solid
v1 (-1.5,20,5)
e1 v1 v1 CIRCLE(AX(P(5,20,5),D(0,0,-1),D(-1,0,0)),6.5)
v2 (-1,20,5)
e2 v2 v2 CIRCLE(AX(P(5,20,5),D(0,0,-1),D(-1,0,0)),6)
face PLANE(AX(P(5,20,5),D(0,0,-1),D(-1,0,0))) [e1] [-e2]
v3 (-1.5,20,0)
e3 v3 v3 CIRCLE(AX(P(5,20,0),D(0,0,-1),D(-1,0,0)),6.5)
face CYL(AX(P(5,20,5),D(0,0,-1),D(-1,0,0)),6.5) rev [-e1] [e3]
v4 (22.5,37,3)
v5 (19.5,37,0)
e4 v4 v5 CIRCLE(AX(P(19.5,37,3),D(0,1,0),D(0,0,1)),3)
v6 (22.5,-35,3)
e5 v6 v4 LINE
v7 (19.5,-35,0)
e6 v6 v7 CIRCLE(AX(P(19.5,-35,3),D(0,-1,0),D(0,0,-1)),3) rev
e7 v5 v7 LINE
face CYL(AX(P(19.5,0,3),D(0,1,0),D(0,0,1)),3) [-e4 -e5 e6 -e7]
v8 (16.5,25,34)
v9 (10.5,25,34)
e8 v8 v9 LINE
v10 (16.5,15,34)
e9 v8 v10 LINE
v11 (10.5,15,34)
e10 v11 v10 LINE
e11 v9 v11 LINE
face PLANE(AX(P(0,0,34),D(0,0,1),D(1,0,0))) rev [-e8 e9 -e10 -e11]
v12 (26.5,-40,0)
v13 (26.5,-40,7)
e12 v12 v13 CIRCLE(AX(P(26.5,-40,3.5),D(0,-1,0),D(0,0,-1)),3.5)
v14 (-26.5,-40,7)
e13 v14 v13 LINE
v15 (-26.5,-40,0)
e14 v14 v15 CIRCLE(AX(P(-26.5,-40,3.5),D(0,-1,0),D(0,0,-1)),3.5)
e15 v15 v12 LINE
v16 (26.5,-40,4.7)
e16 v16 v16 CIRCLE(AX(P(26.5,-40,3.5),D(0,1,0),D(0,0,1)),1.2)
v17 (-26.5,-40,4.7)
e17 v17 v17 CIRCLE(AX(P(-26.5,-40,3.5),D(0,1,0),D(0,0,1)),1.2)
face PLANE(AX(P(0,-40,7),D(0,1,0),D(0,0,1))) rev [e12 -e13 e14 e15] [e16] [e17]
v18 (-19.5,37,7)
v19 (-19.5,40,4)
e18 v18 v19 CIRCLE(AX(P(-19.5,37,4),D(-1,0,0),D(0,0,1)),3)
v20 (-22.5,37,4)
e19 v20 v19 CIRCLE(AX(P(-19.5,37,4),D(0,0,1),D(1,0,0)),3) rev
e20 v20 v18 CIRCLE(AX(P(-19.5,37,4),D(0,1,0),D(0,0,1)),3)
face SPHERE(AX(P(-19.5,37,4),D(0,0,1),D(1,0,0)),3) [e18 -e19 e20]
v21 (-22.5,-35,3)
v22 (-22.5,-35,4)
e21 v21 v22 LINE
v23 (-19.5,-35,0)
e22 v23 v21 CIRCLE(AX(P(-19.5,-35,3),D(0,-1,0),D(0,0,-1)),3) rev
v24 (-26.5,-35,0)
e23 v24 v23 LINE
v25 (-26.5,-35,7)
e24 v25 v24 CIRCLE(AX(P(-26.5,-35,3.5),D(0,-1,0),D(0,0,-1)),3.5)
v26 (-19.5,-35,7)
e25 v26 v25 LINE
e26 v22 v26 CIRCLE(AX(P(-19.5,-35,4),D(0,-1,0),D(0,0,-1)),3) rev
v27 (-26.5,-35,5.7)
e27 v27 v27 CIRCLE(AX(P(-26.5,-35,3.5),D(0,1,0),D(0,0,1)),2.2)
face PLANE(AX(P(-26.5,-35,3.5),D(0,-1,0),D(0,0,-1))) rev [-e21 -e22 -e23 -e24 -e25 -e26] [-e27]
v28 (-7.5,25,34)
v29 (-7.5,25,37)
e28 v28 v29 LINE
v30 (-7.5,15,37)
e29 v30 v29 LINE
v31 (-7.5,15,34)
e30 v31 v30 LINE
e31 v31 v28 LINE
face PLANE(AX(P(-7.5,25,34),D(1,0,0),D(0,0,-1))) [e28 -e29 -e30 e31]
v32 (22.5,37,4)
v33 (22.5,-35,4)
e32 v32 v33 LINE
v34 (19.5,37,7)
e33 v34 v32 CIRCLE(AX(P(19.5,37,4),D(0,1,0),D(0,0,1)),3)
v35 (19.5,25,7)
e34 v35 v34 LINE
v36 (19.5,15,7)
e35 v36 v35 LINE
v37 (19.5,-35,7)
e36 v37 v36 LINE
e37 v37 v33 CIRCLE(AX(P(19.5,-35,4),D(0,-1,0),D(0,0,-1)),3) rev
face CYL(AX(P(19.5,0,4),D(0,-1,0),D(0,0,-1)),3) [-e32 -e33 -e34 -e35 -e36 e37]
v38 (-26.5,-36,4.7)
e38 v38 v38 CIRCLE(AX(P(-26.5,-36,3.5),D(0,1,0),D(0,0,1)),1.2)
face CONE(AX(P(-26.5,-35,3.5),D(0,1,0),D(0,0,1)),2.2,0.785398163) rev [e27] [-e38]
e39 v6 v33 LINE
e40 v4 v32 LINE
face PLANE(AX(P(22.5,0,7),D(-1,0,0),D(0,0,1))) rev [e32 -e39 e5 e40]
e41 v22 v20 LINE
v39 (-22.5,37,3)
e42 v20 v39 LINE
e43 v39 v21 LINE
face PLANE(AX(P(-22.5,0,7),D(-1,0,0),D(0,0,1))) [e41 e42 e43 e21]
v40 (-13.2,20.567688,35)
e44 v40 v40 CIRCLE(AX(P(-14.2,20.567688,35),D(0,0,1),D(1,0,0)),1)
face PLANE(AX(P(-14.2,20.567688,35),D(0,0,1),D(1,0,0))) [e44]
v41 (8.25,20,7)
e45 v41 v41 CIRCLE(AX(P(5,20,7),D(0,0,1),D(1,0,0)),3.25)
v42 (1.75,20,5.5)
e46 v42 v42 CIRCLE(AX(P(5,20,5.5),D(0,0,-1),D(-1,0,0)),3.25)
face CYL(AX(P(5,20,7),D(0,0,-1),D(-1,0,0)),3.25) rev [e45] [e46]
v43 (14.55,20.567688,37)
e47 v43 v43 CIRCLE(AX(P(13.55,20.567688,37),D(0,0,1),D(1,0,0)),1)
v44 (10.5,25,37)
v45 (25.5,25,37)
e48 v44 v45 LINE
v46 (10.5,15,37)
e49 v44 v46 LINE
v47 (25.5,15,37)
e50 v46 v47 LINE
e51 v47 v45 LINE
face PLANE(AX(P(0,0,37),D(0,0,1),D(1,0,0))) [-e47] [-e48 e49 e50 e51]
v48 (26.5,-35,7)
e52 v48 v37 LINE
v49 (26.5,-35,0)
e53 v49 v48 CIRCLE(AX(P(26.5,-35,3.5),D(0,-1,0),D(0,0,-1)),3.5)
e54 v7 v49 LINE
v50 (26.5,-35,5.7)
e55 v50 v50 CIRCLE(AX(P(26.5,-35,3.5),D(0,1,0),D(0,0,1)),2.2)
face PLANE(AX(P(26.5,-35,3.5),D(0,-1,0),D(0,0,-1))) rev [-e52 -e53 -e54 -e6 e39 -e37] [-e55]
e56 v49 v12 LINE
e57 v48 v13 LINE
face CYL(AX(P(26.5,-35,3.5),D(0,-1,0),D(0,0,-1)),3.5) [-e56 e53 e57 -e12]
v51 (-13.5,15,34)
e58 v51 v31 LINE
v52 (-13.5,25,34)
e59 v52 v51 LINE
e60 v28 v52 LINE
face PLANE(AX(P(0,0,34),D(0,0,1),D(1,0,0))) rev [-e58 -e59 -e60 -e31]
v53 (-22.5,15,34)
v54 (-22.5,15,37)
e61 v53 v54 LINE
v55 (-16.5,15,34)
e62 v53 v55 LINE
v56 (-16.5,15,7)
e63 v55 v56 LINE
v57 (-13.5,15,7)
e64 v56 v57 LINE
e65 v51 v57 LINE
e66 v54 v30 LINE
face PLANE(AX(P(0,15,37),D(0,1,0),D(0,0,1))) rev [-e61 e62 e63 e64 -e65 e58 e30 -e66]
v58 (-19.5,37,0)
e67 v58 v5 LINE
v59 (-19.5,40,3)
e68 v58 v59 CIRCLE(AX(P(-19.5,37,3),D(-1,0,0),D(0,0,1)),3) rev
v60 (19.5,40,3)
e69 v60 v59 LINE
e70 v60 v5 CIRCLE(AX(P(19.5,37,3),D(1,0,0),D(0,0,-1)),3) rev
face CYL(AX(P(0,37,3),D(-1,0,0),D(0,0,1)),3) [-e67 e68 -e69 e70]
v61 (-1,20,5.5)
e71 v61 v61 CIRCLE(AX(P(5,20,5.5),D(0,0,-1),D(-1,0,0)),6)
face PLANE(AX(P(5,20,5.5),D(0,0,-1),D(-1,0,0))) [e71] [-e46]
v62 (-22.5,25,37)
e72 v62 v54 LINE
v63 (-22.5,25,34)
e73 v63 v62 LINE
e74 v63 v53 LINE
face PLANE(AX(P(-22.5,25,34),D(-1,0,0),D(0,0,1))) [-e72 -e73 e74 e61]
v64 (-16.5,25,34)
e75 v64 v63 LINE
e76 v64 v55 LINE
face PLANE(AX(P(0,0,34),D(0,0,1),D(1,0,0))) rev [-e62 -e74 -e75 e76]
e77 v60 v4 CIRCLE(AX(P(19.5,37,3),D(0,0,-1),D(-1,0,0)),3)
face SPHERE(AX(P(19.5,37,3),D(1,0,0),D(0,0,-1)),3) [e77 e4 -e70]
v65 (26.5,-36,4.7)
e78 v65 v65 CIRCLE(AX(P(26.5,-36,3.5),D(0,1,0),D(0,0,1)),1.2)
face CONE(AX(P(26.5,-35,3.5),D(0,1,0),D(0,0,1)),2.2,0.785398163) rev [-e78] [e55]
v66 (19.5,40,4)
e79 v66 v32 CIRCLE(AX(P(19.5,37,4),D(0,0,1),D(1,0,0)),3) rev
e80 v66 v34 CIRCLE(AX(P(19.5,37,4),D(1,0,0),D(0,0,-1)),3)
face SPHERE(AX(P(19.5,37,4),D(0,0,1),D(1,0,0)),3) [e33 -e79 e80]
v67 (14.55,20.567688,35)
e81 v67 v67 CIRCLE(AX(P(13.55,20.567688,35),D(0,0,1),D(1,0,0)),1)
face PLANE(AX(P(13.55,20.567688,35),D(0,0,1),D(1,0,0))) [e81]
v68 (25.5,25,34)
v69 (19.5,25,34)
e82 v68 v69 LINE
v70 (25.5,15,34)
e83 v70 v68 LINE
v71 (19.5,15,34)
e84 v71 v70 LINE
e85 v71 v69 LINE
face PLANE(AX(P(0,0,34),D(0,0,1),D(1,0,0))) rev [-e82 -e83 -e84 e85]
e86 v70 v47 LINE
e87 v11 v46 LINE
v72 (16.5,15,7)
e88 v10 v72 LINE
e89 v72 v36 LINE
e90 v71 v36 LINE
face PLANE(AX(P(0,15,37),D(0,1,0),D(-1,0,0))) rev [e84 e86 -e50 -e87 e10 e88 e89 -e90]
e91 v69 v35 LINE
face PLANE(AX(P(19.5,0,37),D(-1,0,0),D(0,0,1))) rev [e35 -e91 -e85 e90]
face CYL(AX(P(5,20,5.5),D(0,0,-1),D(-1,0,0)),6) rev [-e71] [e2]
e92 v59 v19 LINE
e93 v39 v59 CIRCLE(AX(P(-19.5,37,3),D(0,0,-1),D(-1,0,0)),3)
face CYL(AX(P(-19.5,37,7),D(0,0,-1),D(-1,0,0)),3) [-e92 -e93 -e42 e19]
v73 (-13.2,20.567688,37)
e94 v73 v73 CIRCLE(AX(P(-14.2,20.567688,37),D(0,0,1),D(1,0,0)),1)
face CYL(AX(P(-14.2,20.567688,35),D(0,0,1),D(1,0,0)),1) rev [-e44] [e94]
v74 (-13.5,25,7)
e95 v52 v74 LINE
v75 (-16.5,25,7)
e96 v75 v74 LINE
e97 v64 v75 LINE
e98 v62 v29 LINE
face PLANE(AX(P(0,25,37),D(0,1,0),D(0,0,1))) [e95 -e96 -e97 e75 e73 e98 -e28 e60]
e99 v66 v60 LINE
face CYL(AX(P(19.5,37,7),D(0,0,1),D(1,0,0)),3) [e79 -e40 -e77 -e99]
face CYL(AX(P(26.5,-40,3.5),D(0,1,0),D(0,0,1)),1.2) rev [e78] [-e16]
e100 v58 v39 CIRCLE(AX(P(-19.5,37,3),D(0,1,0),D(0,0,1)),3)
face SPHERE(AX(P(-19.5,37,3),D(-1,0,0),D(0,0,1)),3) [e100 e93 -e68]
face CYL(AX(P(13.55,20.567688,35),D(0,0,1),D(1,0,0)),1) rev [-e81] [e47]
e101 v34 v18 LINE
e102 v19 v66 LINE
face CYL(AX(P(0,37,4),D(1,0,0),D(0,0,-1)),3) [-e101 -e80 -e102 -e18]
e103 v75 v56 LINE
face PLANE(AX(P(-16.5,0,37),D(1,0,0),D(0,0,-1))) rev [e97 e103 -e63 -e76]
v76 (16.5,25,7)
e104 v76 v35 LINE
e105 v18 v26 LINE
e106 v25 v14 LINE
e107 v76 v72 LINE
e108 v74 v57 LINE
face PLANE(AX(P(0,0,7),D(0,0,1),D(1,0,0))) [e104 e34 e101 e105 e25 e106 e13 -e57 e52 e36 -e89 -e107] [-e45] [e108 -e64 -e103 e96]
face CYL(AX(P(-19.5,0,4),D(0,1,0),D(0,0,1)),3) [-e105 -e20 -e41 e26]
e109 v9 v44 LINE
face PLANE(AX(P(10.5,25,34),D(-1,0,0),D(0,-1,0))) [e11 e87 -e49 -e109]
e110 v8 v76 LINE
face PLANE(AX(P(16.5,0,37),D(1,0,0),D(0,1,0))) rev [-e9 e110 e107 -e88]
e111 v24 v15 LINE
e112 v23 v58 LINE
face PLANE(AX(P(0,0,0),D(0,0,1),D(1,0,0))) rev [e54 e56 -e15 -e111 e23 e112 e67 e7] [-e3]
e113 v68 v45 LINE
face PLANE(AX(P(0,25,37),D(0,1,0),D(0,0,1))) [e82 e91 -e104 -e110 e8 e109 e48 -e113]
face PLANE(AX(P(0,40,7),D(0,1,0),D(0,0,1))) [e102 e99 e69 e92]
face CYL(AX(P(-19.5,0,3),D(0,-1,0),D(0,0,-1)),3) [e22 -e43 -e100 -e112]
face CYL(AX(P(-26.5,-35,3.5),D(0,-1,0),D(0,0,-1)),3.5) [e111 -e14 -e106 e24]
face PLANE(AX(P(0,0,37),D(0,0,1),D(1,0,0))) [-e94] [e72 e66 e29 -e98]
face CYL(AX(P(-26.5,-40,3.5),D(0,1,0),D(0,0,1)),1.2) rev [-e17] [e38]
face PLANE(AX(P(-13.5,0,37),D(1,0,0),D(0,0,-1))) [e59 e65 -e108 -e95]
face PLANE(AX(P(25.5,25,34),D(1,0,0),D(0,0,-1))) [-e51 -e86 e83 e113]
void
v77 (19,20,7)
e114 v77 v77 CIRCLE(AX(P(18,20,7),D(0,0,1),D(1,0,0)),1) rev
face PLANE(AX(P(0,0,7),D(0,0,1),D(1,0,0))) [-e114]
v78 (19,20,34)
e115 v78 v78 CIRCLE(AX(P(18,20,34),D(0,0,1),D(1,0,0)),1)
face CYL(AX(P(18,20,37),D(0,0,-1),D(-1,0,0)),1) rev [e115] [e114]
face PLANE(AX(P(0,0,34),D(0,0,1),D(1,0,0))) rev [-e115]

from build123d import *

# Parameters (mm, degrees)
CROQUIS1_W                   = 45
CROQUIS1_H                   = 80
CROQUIS1_R                   = 3.25
SALIENTE_EXTRUIR1_DEPTH      = 7
CROQUIS2_R                   = 6.5
CORTAR_EXTRUIR1_DEPTH        = 5
CROQUIS3_R                   = 6
CORTAR_EXTRUIR2_DEPTH        = 0.5
REDONDEO2_R                  = 3
SALIENTE_EXTRUIR2_DEPTH      = 5
TALADROAVANZADO1_OUTLINE_R   = 1.2
TALADROAVANZADO1_DEPTH       = 1
TALADROAVANZADO1_DRAFT       = -45
TALADROAVANZADO1_2_OUTLINE_R = 1.2
TALADROAVANZADO1_2_DEPTH     = 1
TALADROAVANZADO1_2_DRAFT     = -45
CROQUIS8_R                   = 1.2
CORTAR_EXTRUIR3_DEPTH        = 83.006097334
CROQUIS9_W                   = 3
CROQUIS9_H                   = 10
CROQUIS9_R                   = 1
SALIENTE_EXTRUIR3_DEPTH      = 30
CROQUIS10_W                  = 15
CROQUIS10_H                  = 10
SALIENTE_EXTRUIR4_DEPTH      = 3
CROQUIS11_R                  = 1
CORTAR_EXTRUIR5_DEPTH        = 2


# Read off the part's stored shape, not the designer's step: TaladroAvanzado1
with BuildPart() as part:
    # Croquis1 → Saliente-Extruir1 (new body)
    with BuildSketch(Plane.XY):
        Rectangle(CROQUIS1_W, CROQUIS1_H)
        with Locations((5, 20)):
            Circle(CROQUIS1_R, mode=Mode.SUBTRACT)
    extrude(amount=SALIENTE_EXTRUIR1_DEPTH)

    # Croquis2 → Cortar-Extruir1 (cut)
    with BuildSketch(Plane(origin=(0, 0, 0), x_dir=(-1, 0, 0), z_dir=(0, 0, -1))):
        with Locations((-5, 20)):
            Circle(CROQUIS2_R)
    extrude(amount=-CORTAR_EXTRUIR1_DEPTH, mode=Mode.SUBTRACT)

    # Croquis3 → Cortar-Extruir2 (cut)
    with BuildSketch(Plane(origin=(0, 0, 5), x_dir=(-1, 0, 0), z_dir=(0, 0, -1))):
        with Locations((-5, 20)):
            Circle(CROQUIS3_R)
    extrude(amount=-CORTAR_EXTRUIR2_DEPTH, mode=Mode.SUBTRACT)

    # Redondeo2
    redondeo2_edges = [part.edges().sort_by_distance(p)[0] for p in [
        (-22.5, 40, 3.5),
        (22.5, 40, 3.5),
        (22.5, 0, 7),
        (0, 40, 7),
        (-22.5, 0, 7),
        (-22.5, 0, 0),
        (0, 40, 0),
        (22.5, 0, 0),
    ]]
    fillet(redondeo2_edges, radius=REDONDEO2_R)

    # Croquis4 → Saliente-Extruir2 (add)
    with BuildSketch(Plane.XZ.offset(40)):
        with BuildLine():
            Line((-19.5, 7), (-26.5, 7))
            ThreePointArc((-26.5, 7), (-30, 3.5), (-26.5, 0))
            Line((-26.5, 0), (-19.5, 0))
            Line((-19.5, 0), (-19.5, 7))
        make_face()
        with BuildLine():
            Line((19.5, 7), (26.5, 7))
            ThreePointArc((26.5, 7), (30, 3.5), (26.5, 0))
            Line((26.5, 0), (19.5, 0))
            Line((19.5, 0), (19.5, 7))
        make_face()
    extrude(amount=-SALIENTE_EXTRUIR2_DEPTH)


with BuildPart() as taladroavanzado1_tool:
    # TaladroAvanzado1 outline → TaladroAvanzado1 (with draft: the straight prism first)
    with BuildSketch(Plane(origin=(0, -36, 0), x_dir=(1, 0, 0), z_dir=(0, 1, 0))):
        with Locations((26.5, -3.5)):
            Circle(TALADROAVANZADO1_OUTLINE_R)
    extrude(amount=TALADROAVANZADO1_DEPTH)
    # TaladroAvanzado1: the draft: its side faces are tilted about the plane it starts from
    taladroavanzado1_sides = [taladroavanzado1_tool.faces().sort_by_distance(p)[0] for p in [
        (25.3, -35.5, 3.5),
    ]]
    draft(taladroavanzado1_sides, Plane(origin=(0, -36, 0), x_dir=(1, 0, 0), z_dir=(0, 1, 0)), TALADROAVANZADO1_DRAFT)


with BuildPart() as part_1:
    add(part.part)

    # TaladroAvanzado1: cut by taladroavanzado1_tool
    add(taladroavanzado1_tool.part, mode=Mode.SUBTRACT)


with BuildPart() as taladroavanzado1_2_tool:
    # TaladroAvanzado1 2 outline → TaladroAvanzado1 2 (with draft: the straight prism first)
    with BuildSketch(Plane(origin=(0, -36, 0), x_dir=(1, 0, 0), z_dir=(0, 1, 0))):
        with Locations((-26.5, -3.5)):
            Circle(TALADROAVANZADO1_2_OUTLINE_R)
    extrude(amount=TALADROAVANZADO1_2_DEPTH)
    # TaladroAvanzado1 2: the draft: its side faces are tilted about the plane it starts from
    taladroavanzado1_2_sides = [taladroavanzado1_2_tool.faces().sort_by_distance(p)[0] for p in [
        (-27.7, -35.5, 3.5),
    ]]
    draft(taladroavanzado1_2_sides, Plane(origin=(0, -36, 0), x_dir=(1, 0, 0), z_dir=(0, 1, 0)), TALADROAVANZADO1_2_DRAFT)


with BuildPart() as part_2:
    add(part_1.part)

    # TaladroAvanzado1 2: cut by taladroavanzado1_2_tool
    add(taladroavanzado1_2_tool.part, mode=Mode.SUBTRACT)

    # Croquis8 → Cortar-Extruir3 (cut, through all)
    with BuildSketch(Plane(origin=(0, -36, 0), x_dir=(1, 0, 0), z_dir=(0, 1, 0))):
        with Locations(Location((26.5, -3.5, 0), (0, 0, 270))):
            Circle(CROQUIS8_R)
        with Locations(Location((-26.5, -3.5, 0), (0, 0, 270))):
            Circle(CROQUIS8_R)
    extrude(amount=-CORTAR_EXTRUIR3_DEPTH, mode=Mode.SUBTRACT)

    # Croquis9 → Saliente-Extruir3 (add)
    # profile 1 of 2: a face of its own
    with BuildSketch(Plane.XY.offset(7)):
        with Locations((-15, 20)):
            Rectangle(CROQUIS9_W, CROQUIS9_H)
    # profile 2 of 2: a face of its own
    with BuildSketch(Plane.XY.offset(7)):
        with Locations((18, 20)):
            Rectangle(CROQUIS9_W, CROQUIS9_H)
        with Locations((18, 20)):
            Circle(CROQUIS9_R, mode=Mode.SUBTRACT)
    extrude(amount=SALIENTE_EXTRUIR3_DEPTH)

    # Croquis10 → Saliente-Extruir4 (add)
    with BuildSketch(Plane.XY.offset(37)):
        with Locations((-15, 20)):
            Rectangle(CROQUIS10_W, CROQUIS10_H)
        with Locations((18, 20)):
            Rectangle(CROQUIS10_W, CROQUIS10_H)
    extrude(amount=-SALIENTE_EXTRUIR4_DEPTH)

    # Croquis11 → Cortar-Extruir5 (cut)
    with BuildSketch(Plane.XY.offset(37)):
        with Locations((-14.2, 20.567687828)):
            Circle(CROQUIS11_R)
        with Locations((13.55, 20.567687828)):
            Circle(CROQUIS11_R)
    extrude(amount=-CORTAR_EXTRUIR5_DEPTH, mode=Mode.SUBTRACT)


solid = part_2.part
